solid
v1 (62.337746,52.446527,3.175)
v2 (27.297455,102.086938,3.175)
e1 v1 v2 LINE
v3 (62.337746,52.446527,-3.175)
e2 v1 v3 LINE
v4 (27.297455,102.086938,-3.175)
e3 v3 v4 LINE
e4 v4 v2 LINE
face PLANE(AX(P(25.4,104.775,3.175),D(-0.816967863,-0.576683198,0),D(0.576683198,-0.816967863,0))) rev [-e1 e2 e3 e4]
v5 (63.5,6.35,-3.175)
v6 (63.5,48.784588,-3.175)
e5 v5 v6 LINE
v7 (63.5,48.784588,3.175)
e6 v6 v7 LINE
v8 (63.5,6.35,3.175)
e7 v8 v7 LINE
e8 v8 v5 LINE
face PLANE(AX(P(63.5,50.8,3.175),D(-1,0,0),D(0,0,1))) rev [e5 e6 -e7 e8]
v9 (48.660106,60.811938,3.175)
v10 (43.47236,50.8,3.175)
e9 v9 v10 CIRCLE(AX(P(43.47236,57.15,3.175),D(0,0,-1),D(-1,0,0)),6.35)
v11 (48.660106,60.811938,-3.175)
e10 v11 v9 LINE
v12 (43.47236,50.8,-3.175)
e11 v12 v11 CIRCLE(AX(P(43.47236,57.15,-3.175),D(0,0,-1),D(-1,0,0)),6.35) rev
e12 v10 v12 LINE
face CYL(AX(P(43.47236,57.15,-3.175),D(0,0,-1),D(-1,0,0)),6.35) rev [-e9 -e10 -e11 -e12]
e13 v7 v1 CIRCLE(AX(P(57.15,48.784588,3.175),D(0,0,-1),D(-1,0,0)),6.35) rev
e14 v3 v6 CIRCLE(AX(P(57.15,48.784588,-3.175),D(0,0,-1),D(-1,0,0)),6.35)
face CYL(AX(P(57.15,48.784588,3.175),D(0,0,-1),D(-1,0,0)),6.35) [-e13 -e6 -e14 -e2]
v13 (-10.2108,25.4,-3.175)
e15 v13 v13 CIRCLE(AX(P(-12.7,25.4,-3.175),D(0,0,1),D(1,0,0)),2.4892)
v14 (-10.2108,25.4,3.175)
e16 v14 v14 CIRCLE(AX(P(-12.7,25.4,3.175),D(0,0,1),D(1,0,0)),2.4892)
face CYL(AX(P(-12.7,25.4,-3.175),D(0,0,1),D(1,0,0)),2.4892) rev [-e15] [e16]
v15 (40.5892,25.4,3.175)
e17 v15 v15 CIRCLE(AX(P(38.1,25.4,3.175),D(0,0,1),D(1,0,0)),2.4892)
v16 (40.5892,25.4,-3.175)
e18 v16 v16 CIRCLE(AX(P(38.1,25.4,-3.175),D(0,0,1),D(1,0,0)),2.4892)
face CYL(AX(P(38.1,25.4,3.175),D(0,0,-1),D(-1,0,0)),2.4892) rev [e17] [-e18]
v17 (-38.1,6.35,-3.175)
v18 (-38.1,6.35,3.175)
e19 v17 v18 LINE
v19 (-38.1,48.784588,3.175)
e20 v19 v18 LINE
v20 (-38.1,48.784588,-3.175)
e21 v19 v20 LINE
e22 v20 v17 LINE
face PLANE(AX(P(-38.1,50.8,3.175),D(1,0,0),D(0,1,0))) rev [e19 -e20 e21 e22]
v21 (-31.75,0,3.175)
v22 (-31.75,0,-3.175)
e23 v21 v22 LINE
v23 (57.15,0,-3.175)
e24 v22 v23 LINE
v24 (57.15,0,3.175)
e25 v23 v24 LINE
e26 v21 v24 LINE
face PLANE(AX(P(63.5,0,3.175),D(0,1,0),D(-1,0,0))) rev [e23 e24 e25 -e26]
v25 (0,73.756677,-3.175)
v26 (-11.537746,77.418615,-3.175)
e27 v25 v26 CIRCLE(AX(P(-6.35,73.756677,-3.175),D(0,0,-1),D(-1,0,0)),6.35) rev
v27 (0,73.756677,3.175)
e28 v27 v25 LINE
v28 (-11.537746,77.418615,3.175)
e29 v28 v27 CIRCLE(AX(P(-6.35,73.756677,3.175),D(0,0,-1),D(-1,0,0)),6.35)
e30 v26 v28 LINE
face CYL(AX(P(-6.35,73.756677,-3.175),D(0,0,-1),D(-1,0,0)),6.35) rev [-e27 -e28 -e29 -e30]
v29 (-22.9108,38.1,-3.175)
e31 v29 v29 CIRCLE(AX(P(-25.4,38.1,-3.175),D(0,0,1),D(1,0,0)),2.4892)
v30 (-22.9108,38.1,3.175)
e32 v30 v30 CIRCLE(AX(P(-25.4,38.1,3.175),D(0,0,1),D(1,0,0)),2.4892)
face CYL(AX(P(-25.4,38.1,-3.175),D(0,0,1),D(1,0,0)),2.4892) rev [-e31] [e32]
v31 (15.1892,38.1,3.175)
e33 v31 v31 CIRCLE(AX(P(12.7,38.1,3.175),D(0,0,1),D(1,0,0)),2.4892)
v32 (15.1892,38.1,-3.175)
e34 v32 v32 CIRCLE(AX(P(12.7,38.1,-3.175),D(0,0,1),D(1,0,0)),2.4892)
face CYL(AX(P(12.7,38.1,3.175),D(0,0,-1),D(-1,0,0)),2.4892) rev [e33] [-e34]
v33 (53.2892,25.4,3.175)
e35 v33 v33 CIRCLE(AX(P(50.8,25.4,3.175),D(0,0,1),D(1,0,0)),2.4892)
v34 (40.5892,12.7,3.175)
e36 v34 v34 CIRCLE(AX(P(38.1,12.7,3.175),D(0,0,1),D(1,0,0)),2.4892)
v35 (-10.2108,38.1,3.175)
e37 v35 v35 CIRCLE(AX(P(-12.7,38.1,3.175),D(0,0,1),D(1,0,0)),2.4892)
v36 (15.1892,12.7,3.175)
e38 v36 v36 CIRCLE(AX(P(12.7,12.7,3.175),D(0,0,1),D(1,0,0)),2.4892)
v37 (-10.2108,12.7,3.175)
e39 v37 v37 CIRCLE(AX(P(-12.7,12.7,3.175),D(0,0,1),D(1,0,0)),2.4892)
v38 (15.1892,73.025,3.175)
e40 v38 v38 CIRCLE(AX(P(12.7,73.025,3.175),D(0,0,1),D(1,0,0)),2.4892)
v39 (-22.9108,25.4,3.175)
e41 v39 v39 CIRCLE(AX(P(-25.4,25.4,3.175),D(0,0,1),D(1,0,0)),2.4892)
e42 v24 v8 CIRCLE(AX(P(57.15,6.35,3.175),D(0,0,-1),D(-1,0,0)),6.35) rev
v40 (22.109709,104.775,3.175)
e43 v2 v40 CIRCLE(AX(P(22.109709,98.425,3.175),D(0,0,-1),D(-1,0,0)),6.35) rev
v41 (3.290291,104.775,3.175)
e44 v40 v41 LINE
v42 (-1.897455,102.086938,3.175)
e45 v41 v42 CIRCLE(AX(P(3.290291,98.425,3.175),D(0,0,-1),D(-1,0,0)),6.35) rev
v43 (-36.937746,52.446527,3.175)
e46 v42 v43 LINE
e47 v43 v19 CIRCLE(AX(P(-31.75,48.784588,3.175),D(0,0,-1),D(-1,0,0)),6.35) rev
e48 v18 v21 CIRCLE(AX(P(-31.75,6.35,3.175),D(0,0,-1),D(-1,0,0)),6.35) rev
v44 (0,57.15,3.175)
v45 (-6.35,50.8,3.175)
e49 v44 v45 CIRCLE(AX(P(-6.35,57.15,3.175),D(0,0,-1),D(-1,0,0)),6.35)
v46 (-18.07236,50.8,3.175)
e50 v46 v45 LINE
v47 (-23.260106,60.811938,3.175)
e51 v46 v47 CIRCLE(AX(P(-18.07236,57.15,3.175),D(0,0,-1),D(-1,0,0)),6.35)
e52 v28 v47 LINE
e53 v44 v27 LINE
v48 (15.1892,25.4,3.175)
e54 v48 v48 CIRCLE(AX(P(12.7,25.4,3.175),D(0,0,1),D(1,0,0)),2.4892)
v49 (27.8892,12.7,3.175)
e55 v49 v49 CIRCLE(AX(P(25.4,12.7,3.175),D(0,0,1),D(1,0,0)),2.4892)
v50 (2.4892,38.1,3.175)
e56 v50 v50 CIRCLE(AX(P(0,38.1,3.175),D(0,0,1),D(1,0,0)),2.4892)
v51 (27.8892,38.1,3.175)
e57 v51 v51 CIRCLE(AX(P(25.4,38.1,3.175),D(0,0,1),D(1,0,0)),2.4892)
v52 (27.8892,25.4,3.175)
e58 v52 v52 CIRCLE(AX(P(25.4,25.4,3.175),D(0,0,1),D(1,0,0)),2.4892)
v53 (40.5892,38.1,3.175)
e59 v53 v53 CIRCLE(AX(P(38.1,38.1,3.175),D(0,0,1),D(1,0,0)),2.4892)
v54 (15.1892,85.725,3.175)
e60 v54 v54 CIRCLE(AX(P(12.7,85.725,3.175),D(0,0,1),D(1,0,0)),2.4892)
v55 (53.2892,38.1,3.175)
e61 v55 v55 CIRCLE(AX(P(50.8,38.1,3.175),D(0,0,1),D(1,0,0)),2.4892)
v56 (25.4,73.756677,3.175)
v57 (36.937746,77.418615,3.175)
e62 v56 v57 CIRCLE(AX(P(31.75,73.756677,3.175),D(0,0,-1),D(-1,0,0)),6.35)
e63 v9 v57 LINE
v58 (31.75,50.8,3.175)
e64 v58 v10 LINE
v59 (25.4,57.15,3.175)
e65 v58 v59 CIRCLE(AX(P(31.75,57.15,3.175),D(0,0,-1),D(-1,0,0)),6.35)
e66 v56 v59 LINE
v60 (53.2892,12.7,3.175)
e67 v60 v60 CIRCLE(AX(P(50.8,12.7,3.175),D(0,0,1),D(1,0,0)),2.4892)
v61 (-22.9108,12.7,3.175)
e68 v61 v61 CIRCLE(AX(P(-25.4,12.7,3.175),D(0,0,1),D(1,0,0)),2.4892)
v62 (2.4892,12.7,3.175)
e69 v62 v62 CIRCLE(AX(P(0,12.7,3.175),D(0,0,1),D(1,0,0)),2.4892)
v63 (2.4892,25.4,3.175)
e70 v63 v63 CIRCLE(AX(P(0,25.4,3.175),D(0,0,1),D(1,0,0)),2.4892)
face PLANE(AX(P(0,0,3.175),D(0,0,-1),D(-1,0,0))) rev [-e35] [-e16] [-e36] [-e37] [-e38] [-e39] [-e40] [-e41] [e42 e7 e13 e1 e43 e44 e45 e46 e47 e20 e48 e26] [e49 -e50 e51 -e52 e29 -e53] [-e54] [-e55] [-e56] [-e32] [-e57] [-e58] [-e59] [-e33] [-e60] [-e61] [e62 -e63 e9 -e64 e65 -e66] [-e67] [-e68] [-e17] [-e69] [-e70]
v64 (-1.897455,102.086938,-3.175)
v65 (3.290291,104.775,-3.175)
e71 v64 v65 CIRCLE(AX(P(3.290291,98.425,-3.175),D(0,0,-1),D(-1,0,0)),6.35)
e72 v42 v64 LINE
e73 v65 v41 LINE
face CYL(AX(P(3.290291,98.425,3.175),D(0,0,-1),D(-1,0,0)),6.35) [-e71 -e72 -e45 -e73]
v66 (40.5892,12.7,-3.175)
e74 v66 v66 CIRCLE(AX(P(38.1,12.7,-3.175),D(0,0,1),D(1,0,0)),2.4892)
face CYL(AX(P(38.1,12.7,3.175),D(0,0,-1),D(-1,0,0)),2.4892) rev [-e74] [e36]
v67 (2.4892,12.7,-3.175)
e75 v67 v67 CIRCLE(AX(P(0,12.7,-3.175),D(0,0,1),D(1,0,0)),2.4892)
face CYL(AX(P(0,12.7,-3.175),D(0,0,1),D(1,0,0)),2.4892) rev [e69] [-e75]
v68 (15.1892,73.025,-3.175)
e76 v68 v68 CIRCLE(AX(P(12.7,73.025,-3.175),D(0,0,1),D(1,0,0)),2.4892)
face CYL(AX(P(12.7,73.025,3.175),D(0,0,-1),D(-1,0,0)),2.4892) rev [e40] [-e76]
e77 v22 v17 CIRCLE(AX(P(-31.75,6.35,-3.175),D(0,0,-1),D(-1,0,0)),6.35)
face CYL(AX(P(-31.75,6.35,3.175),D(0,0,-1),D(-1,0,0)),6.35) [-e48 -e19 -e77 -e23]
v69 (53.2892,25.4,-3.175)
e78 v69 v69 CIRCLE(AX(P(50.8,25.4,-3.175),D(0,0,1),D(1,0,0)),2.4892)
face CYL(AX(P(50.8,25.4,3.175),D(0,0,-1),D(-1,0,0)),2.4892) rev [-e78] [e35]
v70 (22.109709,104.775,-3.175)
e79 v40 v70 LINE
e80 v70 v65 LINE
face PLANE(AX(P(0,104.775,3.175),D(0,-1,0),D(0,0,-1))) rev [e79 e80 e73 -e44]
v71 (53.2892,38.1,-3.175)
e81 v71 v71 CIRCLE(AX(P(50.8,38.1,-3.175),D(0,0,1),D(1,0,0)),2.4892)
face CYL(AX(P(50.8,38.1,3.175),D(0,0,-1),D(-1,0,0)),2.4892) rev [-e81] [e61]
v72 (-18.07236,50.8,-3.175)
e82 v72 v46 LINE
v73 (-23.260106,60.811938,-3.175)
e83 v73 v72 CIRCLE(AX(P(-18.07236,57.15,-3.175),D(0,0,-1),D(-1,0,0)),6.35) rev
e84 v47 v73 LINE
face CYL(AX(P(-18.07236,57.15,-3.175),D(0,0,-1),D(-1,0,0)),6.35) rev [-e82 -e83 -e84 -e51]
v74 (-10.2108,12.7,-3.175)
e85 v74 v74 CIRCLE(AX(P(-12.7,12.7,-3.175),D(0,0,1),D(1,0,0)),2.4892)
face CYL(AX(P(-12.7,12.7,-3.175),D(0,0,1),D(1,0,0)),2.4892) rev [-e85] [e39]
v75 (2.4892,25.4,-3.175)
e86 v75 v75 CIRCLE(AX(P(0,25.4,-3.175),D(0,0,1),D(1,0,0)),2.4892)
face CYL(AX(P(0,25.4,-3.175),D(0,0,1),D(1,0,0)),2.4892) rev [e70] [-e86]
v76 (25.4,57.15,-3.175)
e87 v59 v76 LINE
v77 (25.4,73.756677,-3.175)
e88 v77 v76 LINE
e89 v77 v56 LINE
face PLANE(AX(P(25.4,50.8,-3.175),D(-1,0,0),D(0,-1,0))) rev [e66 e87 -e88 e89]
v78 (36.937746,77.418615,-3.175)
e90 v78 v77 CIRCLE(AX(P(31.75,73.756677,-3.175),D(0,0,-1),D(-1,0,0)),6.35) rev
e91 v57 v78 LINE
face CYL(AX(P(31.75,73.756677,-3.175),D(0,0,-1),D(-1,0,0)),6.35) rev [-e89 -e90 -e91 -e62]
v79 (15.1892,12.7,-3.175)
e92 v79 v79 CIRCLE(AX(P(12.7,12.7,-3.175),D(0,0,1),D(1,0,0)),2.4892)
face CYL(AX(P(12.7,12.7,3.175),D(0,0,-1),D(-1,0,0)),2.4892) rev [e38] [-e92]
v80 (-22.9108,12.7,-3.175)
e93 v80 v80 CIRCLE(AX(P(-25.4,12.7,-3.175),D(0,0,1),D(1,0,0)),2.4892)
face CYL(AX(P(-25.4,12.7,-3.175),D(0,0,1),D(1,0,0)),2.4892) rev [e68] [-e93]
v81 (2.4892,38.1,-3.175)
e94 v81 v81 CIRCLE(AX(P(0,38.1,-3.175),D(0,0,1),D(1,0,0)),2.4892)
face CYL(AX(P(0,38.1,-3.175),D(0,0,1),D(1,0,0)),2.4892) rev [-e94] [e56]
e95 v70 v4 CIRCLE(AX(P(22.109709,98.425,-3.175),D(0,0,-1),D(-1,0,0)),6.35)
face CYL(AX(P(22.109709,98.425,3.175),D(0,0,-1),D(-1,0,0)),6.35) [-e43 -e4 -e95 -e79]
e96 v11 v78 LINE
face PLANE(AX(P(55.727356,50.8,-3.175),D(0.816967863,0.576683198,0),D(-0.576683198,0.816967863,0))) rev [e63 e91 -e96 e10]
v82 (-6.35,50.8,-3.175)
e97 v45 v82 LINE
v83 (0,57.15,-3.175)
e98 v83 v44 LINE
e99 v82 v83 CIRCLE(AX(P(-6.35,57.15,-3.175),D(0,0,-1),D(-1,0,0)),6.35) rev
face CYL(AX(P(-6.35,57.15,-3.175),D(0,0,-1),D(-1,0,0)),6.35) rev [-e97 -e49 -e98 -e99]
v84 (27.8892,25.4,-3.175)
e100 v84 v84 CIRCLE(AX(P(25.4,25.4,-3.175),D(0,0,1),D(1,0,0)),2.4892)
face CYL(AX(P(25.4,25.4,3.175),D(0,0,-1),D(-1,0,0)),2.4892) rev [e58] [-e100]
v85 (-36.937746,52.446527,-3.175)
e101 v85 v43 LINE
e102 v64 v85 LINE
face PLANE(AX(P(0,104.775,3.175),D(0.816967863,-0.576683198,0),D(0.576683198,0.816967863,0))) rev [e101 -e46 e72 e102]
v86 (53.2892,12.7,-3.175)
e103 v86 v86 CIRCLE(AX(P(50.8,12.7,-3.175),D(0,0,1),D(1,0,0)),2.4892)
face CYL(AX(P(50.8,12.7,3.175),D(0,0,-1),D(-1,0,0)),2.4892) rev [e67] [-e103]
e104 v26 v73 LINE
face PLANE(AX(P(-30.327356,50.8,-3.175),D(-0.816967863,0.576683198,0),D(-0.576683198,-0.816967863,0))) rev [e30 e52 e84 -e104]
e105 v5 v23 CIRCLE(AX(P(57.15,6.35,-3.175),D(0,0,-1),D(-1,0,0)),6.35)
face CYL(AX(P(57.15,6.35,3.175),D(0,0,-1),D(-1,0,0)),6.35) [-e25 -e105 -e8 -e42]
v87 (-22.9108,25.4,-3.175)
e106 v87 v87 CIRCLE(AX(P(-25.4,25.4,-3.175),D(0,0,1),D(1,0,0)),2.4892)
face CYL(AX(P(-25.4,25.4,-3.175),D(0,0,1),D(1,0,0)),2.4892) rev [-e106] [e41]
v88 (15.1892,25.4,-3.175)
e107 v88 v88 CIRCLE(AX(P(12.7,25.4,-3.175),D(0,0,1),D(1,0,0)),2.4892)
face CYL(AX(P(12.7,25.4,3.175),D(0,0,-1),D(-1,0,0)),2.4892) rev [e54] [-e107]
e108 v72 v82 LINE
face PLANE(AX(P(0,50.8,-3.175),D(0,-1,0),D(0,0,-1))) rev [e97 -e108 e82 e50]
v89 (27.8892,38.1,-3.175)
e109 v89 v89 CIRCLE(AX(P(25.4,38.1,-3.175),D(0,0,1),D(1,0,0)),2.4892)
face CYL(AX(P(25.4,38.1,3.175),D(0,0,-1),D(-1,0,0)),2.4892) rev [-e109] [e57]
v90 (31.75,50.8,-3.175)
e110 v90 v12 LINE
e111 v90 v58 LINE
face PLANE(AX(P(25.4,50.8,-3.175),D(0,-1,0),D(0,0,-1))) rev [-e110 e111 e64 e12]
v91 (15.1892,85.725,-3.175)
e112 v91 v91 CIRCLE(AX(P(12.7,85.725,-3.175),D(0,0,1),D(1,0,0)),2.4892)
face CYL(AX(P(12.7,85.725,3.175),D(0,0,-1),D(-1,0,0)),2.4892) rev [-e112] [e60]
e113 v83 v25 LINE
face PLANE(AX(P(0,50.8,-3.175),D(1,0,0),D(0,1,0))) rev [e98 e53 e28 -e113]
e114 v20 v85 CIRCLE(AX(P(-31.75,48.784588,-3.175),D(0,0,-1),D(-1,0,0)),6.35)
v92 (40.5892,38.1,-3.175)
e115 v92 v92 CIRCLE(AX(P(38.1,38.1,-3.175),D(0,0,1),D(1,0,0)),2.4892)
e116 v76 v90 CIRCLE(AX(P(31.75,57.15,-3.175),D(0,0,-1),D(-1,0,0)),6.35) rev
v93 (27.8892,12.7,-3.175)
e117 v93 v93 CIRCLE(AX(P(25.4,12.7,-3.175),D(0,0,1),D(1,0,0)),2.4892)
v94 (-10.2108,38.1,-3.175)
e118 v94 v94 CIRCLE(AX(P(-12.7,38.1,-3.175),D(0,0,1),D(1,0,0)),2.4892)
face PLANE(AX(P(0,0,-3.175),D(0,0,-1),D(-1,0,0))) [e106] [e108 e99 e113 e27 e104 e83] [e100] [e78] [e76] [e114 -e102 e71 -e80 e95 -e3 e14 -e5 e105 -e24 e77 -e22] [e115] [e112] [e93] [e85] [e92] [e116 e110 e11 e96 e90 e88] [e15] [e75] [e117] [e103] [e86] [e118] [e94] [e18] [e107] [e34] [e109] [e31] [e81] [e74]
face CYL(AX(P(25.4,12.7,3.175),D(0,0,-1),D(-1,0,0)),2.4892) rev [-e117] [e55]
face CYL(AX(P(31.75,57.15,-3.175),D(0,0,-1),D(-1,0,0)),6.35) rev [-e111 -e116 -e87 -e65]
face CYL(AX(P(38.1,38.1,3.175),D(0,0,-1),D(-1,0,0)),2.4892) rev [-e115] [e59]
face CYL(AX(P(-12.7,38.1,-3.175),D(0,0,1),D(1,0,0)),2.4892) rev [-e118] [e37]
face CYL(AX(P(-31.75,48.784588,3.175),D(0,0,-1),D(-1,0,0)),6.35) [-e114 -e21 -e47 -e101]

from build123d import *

# Parameters (mm, degrees)
SKETCH1_R           = 2.4892
BOSS_EXTRUDE1_DEPTH = 3.175
LPATTERN1_START     = -3.175
LPATTERN1_OUTLINE_R = 2.4892
LPATTERN1_DEPTH     = 6.35
SKETCH2_R           = 2.4892
CUT_EXTRUDE1_DEPTH  = 123.679962198
FILLET1_R           = 6.35


# Read off the part's stored shape, not the designer's step: LPattern1
with BuildPart() as part:
    # Sketch1 → Boss-Extrude1 (new, symmetric)
    with BuildSketch(Plane.XY):
        Polygon((0, 104.775), (25.4, 104.775), (63.5, 50.8), (63.5, 0), (0, 0), (-38.1, 0), (-38.1, 50.8), align=None)
        with Locations((12.7, 85.725)):
            Circle(SKETCH1_R, mode=Mode.SUBTRACT)
        with Locations((12.7, 73.025)):
            Circle(SKETCH1_R, mode=Mode.SUBTRACT)
        with Locations((12.7, 12.7)):
            Circle(SKETCH1_R, mode=Mode.SUBTRACT)
    extrude(amount=BOSS_EXTRUDE1_DEPTH, both=True)

    # LPattern1 outline → LPattern1 (cut)
    with BuildSketch(Plane.XY.offset(LPATTERN1_START)):
        with Locations((50.8, 38.1)):
            Circle(LPATTERN1_OUTLINE_R)
        with Locations((38.1, 38.1)):
            Circle(LPATTERN1_OUTLINE_R)
        with Locations((25.4, 38.1)):
            Circle(LPATTERN1_OUTLINE_R)
        with Locations((12.7, 38.1)):
            Circle(LPATTERN1_OUTLINE_R)
        with Locations((50.8, 25.4)):
            Circle(LPATTERN1_OUTLINE_R)
        with Locations((38.1, 25.4)):
            Circle(LPATTERN1_OUTLINE_R)
        with Locations((25.4, 25.4)):
            Circle(LPATTERN1_OUTLINE_R)
        with Locations((12.7, 25.4)):
            Circle(LPATTERN1_OUTLINE_R)
        with Locations((50.8, 12.7)):
            Circle(LPATTERN1_OUTLINE_R)
        with Locations((38.1, 12.7)):
            Circle(LPATTERN1_OUTLINE_R)
        with Locations((25.4, 12.7)):
            Circle(LPATTERN1_OUTLINE_R)
    extrude(amount=LPATTERN1_DEPTH, mode=Mode.SUBTRACT)

    # Sketch2 → Cut-Extrude1 (cut, through all)
    with BuildSketch(Plane.XY.offset(3.175)):
        with Locations((12.7, 38.1)):
            Circle(SKETCH2_R)
        with Locations((12.7, 25.4)):
            Circle(SKETCH2_R)
        with Locations((12.7, 12.7)):
            Circle(SKETCH2_R)
        with Locations((0, 12.7)):
            Circle(SKETCH2_R)
        with Locations((0, 25.4)):
            Circle(SKETCH2_R)
        with Locations((0, 38.1)):
            Circle(SKETCH2_R)
        with Locations((-12.7, 12.7)):
            Circle(SKETCH2_R)
        with Locations((-12.7, 25.4)):
            Circle(SKETCH2_R)
        with Locations((-12.7, 38.1)):
            Circle(SKETCH2_R)
        with Locations((-25.4, 12.7)):
            Circle(SKETCH2_R)
        with Locations((-25.4, 25.4)):
            Circle(SKETCH2_R)
        with Locations((-25.4, 38.1)):
            Circle(SKETCH2_R)
        Polygon((25.4, 50.8), (25.4, 93.763754959), (55.727356441, 50.8), align=None)
        Polygon((0, 50.8), (-30.327356441, 50.8), (0, 93.763754959), align=None)
    extrude(amount=-CUT_EXTRUDE1_DEPTH, mode=Mode.SUBTRACT)

    # Fillet1
    fillet1_edges = [part.edges().sort_by_distance(p)[0] for p in [
        (-38.1, 0, 0),
        (-38.1, 50.8, 0),
        (0, 104.775, 0),
        (25.4, 104.775, 0),
        (63.5, 50.8, 0),
        (63.5, 0, 0),
        (55.727356441, 50.8, 0),
        (25.4, 50.8, 0),
        (25.4, 93.763754959, 0),
        (0, 93.763754959, 0),
        (0, 50.8, 0),
        (-30.327356441, 50.8, 0),
    ]]
    fillet(fillet1_edges, radius=FILLET1_R)


solid = part.part
